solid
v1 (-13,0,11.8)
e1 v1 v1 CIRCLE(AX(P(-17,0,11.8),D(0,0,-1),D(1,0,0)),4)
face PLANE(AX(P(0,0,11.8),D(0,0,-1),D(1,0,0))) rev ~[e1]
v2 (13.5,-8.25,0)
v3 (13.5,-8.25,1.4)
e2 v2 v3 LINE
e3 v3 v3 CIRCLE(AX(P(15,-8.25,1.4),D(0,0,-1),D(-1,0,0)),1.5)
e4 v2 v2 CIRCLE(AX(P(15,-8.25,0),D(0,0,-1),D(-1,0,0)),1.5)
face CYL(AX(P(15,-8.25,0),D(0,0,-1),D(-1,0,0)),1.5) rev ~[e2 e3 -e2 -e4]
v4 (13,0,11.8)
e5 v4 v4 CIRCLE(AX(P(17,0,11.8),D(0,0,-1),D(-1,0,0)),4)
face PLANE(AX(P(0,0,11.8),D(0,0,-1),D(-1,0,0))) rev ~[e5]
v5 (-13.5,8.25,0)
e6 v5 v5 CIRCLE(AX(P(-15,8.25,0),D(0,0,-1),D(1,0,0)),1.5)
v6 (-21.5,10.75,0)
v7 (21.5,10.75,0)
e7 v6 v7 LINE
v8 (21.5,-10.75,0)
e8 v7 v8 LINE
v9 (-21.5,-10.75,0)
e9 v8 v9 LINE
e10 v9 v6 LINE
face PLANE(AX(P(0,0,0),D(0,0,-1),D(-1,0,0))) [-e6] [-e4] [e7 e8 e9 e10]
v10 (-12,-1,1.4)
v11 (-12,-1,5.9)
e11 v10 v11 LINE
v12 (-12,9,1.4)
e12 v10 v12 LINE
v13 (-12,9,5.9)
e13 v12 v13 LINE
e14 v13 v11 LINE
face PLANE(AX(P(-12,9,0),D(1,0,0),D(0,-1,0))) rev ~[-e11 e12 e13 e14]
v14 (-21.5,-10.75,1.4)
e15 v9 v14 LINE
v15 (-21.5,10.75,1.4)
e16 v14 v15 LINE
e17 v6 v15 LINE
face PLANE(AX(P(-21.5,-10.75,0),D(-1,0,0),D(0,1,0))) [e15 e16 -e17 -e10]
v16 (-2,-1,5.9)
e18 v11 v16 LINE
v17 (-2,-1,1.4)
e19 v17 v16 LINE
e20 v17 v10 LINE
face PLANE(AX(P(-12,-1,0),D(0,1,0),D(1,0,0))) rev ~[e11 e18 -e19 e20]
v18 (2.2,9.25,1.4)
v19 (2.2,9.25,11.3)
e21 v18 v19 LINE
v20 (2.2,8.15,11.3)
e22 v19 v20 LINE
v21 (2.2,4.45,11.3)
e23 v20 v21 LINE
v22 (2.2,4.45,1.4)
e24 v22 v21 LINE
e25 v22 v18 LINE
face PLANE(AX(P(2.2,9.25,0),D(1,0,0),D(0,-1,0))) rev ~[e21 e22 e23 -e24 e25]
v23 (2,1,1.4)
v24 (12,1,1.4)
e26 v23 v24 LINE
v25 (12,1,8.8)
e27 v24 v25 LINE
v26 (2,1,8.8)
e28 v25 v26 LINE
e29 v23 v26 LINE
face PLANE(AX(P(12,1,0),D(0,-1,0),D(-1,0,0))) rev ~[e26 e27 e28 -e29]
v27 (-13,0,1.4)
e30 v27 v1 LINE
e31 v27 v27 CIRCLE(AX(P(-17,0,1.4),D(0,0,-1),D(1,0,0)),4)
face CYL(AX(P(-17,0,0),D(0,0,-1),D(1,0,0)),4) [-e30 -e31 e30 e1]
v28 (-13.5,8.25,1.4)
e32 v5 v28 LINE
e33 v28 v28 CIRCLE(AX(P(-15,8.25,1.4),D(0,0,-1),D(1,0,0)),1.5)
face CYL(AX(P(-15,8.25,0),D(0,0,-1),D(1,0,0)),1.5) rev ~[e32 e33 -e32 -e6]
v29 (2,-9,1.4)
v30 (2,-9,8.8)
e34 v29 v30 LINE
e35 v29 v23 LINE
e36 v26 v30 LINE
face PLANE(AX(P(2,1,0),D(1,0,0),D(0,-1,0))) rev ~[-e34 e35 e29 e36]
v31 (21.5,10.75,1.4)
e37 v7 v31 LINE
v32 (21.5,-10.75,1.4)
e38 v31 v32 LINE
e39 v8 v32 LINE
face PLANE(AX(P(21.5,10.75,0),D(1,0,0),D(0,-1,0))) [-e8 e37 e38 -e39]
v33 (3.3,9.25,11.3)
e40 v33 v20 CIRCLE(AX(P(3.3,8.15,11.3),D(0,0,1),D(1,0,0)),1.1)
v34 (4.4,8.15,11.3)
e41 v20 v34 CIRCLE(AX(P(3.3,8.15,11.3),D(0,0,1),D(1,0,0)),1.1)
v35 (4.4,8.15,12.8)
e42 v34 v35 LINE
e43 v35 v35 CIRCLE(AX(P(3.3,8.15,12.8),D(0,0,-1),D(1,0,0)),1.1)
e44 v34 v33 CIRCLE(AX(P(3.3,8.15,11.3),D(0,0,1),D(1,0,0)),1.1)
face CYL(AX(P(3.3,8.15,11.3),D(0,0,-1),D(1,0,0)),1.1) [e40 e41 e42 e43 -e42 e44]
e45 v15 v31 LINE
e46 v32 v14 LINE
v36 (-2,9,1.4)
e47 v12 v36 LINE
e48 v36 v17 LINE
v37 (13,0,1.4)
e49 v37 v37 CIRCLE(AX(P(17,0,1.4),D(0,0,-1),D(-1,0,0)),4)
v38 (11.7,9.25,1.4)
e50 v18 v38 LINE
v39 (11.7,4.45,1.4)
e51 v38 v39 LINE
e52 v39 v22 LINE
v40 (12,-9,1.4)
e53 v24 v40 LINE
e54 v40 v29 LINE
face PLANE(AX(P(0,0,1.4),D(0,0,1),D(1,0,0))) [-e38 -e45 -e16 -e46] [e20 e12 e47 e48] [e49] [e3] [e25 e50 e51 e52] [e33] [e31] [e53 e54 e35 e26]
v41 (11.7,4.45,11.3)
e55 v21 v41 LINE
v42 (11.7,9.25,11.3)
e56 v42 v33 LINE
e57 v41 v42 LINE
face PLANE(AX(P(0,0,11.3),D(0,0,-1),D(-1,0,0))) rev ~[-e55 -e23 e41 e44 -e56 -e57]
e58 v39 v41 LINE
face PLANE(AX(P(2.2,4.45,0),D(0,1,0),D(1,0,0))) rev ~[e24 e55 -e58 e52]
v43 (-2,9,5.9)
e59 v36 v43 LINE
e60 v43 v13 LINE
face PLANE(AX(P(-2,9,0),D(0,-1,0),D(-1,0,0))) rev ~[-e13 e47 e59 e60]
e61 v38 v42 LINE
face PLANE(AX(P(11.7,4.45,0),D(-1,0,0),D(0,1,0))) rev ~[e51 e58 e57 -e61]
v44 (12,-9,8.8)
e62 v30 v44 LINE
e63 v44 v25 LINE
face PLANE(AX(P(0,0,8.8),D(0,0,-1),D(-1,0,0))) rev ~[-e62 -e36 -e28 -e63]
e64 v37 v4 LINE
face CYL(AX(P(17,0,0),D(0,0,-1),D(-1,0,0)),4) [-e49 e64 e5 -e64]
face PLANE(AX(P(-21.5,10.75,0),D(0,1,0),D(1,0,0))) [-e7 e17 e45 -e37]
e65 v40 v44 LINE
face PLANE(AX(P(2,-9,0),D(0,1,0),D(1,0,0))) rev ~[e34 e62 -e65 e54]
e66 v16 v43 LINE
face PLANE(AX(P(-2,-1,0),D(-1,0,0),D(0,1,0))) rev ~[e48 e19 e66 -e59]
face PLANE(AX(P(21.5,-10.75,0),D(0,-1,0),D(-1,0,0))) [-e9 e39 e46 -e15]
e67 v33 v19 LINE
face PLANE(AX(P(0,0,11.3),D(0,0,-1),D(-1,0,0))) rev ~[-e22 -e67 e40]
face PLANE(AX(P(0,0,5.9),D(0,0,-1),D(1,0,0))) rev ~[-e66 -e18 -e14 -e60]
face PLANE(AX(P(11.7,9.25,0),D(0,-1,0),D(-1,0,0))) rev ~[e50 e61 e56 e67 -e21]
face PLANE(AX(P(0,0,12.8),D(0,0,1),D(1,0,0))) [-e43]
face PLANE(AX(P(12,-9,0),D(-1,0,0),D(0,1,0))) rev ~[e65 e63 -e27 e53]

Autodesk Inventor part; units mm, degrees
sketch "スケッチ1" plane through (0, 0, 0) normal (0, 0, 1) x (1, 0, 0)
  line L0 (-21.5, 10.75) -> (21.5, 10.75)
  line L1 (21.5, 10.75) -> (21.5, -10.75)
  line L2 (21.5, -10.75) -> (-21.5, -10.75)
  line L3 (-21.5, -10.75) -> (-21.5, 10.75)
  line L4 (-21.5, -10.75) -> (21.5, 10.75)
  line L5 (-21.5, 10.75) -> (21.5, -10.75)
  point P0 (0, 0)
  dimension "d0" = 43
  dimension "d1" = 21.5
extrude "押し出し1" add sketch "スケッチ1" along normal blind 1.4
sketch "スケッチ2" plane through (0, 0, 0) normal (0, 0, -1) x (-1, 0, 0)
  circle A0 centre (-15, -8.25) radius 1.5
  point P0 (0, 0)
  dimension "d4" = 3
  dimension "d5" = 15
  dimension "d6" = 8.25
extrude "押し出し2" cut sketch "スケッチ2" against normal through all
sketch "スケッチ3" plane through (0, 0, 0) normal (0, 0, -1) x (-1, 0, 0)
  circle A0 centre (-17, 0) radius 4
  line L0 (-2, -9) -> (-12, -9)
  line L1 (-12, -9) -> (-12, 1)
  line L2 (-12, 1) -> (-2, 1)
  line L3 (-2, 1) -> (-2, -9)
  point P0 (0, 0)
  dimension "d12" = 8
  dimension "d13" = 17
  dimension "d16" = 10
  dimension "d17" = 10
  dimension "d18" = 2
  dimension "d23" = 1
extrude "押し出し3" add sketch "スケッチ3" against normal blind 11.8
pattern_circular "円形状パターン2" count 2 over 360 about axis through (0, 0, -10) along (0, 0, 1) of "押し出し3", "押し出し2"
sketch "スケッチ4" plane through (0, 0, 0) normal (0, 0, -1) x (-1, 0, 0)
  line L0 (-2.2, 4.45) -> (-11.7, 4.45)
  line L1 (-11.7, 4.45) -> (-11.7, 9.25)
  line L2 (-11.7, 9.25) -> (-2.2, 9.25)
  line L3 (-2.2, 9.25) -> (-2.2, 4.45)
  circle A0 centre (15, 8.25) radius 1.5 projected
  circle A1 centre (-15, -8.25) radius 1.5 projected
  line L4 (21.5, -10.75) -> (-21.5, -10.75) projected
  line L5 (21.5, 10.75) -> (21.5, -10.75) projected
  line L6 (-21.5, 10.75) -> (21.5, 10.75) projected
  line L7 (-21.5, -10.75) -> (-21.5, 10.75) projected
  point P0 (0, 0)
  dimension "d24" = 9.5
  dimension "d25" = 4.8
  dimension "d26" = 1.5
  dimension "d27" = 9.8
extrude "押し出し4" add sketch "スケッチ4" against normal blind 11.3 contours L0 L1 L2 L3
sketch "スケッチ5" plane through (0, 0, 11.3) normal (0, 0, 1) x (1, 0, 0)
  line L0 (2.2, 4.45) -> (11.7, 4.45) projected
  line L1 (11.7, 4.45) -> (11.7, 9.25) projected
  line L2 (11.7, 9.25) -> (2.2, 9.25) projected
  line L3 (2.2, 9.25) -> (2.2, 4.45) projected
  circle A0 centre (3.3, 8.15) radius 1.1
  point P0 (0, 0)
  dimension "d30" = 2.2
extrude "押し出し5" add sketch "スケッチ5" along normal blind 1.5 contours A0
move faces "移動1" translate (0, 0, -3) faces at (8.6667, -2.3333, 11.8)
move faces "移動2" translate (0, 0, -5.9) faces at (-5.3333, 5.6667, 11.8)
properties part number "DC-DCconverter"
